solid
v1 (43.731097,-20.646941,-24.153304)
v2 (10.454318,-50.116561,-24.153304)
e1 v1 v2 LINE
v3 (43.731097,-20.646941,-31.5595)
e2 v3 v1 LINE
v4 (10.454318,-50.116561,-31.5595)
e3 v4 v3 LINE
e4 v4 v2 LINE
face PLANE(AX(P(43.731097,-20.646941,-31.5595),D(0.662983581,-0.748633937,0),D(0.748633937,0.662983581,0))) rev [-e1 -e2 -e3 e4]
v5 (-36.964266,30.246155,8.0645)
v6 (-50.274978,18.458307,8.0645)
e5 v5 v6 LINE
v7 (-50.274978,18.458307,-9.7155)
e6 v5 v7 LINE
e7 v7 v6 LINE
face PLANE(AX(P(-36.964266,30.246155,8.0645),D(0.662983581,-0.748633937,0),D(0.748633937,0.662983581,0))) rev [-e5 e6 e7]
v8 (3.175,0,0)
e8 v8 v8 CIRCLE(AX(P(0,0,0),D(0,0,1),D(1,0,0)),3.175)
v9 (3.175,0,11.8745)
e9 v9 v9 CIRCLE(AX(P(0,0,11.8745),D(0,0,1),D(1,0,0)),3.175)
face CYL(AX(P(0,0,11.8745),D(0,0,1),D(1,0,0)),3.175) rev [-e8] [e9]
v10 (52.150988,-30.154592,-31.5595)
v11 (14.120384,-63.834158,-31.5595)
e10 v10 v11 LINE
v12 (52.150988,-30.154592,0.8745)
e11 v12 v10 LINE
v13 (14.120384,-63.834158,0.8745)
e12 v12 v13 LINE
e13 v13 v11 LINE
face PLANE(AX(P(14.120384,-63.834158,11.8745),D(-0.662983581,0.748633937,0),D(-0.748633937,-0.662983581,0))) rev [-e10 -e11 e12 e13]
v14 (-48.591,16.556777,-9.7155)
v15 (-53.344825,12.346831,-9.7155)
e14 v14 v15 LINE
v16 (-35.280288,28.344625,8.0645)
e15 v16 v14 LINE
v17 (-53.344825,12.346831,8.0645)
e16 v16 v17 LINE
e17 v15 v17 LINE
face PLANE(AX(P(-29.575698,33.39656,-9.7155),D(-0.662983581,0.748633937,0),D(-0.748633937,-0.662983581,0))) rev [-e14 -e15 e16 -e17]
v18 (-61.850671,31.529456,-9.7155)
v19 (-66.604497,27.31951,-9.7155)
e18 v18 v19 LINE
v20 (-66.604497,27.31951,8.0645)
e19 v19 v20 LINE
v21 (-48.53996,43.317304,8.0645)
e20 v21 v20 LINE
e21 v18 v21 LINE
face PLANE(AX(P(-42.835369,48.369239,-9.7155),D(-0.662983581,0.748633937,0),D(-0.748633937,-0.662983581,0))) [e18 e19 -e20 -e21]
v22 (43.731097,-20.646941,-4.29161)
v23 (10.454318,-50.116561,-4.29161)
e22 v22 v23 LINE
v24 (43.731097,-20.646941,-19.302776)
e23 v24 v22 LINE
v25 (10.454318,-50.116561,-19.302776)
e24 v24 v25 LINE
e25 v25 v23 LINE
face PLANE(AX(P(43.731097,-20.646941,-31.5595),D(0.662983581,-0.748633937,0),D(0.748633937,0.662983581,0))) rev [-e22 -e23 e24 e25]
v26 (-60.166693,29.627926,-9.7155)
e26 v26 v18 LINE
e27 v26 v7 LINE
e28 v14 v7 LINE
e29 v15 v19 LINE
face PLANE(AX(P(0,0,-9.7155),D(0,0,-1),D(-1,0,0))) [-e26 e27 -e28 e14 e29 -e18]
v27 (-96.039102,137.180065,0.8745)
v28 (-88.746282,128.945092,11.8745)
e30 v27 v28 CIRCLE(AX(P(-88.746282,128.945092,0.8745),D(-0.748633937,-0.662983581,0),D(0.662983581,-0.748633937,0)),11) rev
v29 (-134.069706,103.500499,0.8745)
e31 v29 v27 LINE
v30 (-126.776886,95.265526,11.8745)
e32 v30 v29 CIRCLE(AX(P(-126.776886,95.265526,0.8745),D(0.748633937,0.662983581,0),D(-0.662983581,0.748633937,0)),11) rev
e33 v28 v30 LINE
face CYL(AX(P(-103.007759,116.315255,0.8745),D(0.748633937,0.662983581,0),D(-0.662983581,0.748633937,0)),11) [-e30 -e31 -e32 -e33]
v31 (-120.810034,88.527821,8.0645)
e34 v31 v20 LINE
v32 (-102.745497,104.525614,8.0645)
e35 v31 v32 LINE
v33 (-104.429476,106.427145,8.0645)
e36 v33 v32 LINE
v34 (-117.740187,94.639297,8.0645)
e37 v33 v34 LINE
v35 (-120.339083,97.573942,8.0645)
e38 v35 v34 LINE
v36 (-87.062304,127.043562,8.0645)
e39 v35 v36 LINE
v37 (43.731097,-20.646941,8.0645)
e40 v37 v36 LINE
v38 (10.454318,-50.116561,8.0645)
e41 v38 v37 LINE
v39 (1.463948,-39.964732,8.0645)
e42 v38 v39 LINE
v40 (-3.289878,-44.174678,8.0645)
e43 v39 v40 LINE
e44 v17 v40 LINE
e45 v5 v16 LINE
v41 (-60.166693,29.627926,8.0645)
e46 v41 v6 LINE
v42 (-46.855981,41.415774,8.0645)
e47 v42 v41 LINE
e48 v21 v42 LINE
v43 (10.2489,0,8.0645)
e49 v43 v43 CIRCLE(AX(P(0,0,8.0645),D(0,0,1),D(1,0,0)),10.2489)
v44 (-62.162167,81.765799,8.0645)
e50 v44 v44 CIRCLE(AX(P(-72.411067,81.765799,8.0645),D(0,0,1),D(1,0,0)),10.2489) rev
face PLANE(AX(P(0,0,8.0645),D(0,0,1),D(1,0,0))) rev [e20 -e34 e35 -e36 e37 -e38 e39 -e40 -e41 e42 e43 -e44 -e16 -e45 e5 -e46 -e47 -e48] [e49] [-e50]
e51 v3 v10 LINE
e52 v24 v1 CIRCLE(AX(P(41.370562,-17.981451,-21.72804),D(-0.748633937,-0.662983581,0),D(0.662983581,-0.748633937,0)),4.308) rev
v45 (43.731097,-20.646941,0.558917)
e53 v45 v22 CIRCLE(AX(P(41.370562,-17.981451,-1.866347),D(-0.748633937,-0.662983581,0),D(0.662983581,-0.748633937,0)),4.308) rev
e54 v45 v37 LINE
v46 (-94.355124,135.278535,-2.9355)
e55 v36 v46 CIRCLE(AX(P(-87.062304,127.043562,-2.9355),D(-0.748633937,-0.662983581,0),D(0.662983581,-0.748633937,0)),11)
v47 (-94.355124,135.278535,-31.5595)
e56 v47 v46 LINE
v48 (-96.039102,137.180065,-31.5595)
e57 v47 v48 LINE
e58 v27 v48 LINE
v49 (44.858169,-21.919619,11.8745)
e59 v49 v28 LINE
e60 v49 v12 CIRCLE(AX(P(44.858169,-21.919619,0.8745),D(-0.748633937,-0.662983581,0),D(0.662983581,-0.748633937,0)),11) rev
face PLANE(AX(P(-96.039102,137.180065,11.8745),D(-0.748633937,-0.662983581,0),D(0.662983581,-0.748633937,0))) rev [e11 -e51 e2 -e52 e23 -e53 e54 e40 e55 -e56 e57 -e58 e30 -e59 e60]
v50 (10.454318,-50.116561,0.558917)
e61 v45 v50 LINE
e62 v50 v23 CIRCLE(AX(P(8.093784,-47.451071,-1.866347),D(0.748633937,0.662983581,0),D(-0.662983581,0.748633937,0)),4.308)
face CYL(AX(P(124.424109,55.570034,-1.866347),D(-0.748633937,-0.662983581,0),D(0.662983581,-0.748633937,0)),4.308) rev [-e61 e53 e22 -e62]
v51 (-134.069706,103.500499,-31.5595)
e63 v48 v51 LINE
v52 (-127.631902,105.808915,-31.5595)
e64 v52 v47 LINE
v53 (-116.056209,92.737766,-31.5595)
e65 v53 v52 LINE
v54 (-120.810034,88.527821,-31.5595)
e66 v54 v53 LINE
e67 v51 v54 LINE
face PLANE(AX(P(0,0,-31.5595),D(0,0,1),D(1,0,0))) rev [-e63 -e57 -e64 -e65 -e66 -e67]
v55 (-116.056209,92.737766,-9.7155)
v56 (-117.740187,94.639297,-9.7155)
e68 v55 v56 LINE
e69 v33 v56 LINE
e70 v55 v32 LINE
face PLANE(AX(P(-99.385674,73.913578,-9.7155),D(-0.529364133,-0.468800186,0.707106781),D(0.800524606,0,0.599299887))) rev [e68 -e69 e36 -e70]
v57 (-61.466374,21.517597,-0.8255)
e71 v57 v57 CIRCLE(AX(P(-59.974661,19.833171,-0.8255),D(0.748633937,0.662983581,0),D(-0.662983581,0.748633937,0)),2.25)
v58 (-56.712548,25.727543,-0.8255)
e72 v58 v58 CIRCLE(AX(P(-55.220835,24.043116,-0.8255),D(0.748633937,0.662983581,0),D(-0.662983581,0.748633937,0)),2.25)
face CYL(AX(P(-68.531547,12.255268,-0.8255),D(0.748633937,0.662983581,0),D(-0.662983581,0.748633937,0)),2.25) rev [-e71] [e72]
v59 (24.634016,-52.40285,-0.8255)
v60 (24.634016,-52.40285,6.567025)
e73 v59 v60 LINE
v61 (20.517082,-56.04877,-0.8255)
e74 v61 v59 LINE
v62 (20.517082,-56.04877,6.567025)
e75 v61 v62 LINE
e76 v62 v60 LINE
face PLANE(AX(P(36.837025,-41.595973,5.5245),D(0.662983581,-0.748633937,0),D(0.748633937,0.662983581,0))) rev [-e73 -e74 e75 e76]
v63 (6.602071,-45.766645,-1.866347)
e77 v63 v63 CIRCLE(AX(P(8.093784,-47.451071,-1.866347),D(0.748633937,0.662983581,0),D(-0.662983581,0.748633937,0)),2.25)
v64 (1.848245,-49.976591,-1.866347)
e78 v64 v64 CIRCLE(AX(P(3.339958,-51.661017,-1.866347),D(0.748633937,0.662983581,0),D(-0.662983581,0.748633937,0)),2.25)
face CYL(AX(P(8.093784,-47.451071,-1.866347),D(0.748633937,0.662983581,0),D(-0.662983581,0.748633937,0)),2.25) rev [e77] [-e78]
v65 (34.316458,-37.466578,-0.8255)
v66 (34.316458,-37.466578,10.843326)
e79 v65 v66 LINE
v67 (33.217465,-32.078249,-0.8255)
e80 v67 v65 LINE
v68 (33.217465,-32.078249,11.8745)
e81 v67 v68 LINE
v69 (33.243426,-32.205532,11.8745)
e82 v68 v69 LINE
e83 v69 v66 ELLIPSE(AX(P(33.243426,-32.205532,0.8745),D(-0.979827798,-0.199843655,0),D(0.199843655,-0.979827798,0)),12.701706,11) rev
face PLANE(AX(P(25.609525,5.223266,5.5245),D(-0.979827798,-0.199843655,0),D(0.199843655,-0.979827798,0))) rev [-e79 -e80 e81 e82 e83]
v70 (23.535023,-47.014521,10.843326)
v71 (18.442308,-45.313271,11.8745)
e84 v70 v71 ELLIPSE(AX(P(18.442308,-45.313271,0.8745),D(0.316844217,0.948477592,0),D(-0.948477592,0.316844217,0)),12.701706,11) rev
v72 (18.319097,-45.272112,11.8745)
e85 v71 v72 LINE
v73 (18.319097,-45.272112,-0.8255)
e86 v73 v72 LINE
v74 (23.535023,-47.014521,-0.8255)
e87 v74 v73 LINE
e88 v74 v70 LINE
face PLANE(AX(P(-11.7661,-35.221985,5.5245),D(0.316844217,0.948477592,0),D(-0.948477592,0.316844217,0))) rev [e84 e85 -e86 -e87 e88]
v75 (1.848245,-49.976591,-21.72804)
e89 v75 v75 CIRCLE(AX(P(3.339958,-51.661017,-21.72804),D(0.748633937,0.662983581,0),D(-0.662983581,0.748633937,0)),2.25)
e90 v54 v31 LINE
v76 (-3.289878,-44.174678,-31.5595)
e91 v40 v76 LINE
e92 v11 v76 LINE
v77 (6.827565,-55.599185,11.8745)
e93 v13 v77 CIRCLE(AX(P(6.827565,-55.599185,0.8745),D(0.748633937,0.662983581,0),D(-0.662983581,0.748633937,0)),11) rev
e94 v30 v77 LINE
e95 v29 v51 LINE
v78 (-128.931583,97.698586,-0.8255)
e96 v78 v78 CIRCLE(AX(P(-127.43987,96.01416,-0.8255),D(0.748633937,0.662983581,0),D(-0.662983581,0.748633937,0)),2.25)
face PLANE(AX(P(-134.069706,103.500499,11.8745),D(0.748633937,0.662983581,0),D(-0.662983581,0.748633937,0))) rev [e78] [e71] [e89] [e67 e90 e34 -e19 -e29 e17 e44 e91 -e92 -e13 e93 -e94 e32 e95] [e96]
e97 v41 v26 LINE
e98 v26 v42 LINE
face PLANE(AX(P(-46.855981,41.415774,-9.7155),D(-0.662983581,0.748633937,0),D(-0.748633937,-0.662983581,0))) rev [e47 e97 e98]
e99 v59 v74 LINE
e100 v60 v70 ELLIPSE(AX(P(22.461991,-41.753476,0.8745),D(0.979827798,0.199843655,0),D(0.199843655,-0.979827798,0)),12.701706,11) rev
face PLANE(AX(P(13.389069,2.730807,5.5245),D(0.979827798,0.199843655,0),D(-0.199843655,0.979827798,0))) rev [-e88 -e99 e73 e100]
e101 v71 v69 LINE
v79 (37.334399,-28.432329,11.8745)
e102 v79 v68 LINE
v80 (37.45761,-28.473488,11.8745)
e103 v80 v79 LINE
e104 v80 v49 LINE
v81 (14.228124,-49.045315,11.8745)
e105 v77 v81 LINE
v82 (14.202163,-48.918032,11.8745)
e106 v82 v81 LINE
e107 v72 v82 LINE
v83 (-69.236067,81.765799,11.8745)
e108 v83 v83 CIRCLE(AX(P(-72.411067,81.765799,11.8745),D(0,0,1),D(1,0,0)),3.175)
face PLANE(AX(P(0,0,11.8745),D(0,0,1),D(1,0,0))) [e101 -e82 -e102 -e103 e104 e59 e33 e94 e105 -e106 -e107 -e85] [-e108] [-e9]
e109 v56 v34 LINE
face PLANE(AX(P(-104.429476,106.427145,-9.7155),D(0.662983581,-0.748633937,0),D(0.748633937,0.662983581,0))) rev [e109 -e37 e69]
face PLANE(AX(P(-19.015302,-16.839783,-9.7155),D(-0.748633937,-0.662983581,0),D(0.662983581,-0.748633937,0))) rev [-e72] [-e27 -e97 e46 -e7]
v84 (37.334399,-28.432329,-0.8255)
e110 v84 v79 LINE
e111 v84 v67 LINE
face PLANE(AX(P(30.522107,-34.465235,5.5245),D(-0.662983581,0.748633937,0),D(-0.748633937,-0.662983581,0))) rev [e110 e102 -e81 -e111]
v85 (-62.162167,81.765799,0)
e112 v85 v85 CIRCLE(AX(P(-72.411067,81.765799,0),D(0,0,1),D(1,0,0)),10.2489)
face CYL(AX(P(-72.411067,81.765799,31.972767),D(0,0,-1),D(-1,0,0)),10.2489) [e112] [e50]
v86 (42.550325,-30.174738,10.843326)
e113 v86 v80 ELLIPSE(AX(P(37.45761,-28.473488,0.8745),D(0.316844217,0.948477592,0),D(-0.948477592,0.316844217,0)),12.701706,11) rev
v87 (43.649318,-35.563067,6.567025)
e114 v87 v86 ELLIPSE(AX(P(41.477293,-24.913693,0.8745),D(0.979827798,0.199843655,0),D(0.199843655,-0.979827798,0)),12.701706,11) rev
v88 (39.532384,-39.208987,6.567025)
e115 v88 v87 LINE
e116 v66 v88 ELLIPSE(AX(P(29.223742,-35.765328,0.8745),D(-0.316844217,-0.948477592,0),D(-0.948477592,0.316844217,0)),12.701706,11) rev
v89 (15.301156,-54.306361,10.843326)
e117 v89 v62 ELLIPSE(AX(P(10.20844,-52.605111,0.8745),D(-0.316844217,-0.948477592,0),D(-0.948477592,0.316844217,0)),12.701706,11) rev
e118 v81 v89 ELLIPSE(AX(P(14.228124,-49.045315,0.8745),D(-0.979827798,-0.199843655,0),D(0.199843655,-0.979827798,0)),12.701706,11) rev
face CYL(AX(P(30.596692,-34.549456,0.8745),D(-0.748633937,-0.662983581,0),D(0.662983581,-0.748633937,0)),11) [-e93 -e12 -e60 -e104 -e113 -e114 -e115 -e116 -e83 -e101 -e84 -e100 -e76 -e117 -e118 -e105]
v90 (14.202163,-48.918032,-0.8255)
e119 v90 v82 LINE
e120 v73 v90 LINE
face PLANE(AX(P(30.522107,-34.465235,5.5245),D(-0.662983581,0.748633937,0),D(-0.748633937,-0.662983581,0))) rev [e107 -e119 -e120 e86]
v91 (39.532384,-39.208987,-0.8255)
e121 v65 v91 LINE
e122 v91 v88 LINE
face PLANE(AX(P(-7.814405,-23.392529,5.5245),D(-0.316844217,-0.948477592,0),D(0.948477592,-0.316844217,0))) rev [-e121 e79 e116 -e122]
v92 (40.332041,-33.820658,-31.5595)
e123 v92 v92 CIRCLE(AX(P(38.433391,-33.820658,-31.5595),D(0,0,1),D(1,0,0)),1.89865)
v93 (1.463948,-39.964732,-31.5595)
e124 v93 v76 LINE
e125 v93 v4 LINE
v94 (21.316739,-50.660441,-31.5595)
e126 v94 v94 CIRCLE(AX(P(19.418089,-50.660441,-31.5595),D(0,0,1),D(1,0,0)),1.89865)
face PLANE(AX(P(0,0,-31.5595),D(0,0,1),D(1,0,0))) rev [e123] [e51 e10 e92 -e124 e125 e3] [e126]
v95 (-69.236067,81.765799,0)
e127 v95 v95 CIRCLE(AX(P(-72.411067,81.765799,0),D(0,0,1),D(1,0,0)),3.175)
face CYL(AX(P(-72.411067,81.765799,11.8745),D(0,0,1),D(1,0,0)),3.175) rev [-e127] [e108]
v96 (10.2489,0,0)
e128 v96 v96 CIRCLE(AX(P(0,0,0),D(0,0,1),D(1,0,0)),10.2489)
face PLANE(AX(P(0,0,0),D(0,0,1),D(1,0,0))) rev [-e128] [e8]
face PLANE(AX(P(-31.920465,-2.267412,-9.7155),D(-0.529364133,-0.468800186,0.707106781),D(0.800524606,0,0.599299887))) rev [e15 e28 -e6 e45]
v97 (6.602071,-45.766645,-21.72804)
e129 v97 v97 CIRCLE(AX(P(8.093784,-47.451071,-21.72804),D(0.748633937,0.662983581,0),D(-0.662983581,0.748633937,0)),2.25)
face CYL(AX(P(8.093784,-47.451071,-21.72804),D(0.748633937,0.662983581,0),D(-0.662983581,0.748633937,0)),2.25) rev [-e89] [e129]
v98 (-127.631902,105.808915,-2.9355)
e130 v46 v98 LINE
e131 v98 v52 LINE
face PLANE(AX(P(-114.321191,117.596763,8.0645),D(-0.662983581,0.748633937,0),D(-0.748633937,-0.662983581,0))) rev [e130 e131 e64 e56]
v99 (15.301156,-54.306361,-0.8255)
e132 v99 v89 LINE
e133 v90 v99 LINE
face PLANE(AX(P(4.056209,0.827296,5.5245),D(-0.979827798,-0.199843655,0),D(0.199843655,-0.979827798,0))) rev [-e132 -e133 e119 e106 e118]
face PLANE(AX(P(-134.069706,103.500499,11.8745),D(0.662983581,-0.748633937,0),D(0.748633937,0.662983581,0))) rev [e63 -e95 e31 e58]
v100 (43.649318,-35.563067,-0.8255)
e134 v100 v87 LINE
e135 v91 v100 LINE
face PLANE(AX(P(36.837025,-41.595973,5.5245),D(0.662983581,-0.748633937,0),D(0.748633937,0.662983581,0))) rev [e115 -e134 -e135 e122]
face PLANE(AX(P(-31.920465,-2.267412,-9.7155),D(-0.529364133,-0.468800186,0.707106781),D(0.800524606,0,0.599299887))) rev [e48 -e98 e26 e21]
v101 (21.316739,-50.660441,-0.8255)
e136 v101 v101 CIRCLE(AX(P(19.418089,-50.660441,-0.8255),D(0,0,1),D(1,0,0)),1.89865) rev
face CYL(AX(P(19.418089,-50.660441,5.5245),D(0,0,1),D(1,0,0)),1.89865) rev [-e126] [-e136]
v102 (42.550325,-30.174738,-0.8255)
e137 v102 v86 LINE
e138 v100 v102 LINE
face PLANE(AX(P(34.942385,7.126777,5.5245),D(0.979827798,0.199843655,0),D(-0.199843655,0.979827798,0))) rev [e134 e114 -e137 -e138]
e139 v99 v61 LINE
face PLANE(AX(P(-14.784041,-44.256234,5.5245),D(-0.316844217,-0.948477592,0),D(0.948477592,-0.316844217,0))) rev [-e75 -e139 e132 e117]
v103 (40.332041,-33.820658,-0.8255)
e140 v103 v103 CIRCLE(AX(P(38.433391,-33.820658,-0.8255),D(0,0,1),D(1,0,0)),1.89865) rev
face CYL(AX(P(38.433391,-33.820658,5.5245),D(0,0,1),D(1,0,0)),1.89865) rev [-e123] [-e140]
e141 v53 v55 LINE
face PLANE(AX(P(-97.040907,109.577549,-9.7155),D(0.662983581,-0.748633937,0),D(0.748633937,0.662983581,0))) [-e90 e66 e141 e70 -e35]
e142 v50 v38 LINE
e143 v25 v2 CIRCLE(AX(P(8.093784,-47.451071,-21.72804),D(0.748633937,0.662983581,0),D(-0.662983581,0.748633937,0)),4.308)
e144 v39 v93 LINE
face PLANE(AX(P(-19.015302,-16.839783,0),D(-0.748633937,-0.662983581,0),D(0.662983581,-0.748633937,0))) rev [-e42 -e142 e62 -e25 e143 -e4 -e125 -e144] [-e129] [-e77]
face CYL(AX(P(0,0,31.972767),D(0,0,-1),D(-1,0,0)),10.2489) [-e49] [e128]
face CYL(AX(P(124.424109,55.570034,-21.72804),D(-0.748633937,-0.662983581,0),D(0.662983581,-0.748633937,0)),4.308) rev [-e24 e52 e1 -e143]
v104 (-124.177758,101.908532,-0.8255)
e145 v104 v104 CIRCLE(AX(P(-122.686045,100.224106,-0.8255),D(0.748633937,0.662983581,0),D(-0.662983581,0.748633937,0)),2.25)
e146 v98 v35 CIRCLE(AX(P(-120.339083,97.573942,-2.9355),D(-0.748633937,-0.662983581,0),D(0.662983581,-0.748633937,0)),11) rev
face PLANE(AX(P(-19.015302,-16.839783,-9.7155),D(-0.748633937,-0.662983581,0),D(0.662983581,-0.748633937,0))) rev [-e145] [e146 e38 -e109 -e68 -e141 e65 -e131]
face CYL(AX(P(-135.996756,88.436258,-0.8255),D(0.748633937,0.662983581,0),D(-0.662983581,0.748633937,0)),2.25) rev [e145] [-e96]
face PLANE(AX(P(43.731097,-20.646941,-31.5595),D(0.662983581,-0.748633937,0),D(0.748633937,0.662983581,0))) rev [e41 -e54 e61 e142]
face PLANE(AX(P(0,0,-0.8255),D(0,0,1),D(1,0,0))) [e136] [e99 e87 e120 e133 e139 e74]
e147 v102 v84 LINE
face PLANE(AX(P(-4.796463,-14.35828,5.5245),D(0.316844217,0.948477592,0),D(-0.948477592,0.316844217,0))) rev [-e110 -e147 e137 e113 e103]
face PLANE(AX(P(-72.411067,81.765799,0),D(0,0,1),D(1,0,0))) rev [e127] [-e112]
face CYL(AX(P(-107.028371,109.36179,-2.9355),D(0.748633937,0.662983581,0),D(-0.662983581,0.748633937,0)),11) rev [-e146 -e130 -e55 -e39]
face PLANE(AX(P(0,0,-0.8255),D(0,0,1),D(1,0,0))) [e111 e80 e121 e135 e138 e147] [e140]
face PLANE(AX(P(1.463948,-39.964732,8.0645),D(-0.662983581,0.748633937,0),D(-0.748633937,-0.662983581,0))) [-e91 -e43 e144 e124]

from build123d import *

# Parameters (mm, degrees)
SKETCH1_R                   = 10.2489
BOSS_EXTRUDE1_DEPTH         = 2.9845
BOSS_EXTRUDE1_2_DEPTH       = 2.9845
SKETCH2_R                   = 10.2489
BOSS_EXTRUDE2_DEPTH         = 5.08
BOSS_EXTRUDE3_DEPTH         = 3.81
F_1_4_0_25_DIAMETER_HOLE1_D = 6.35
BOSS_EXTRUDE4_DEPTH         = 17.78
SKETCH8_R                   = 2.25
CUT_EXTRUDE1_DEPTH          = 17.78
SKETCH9_W                   = 17.78
SKETCH9_H                   = 2.54
BOSS_EXTRUDE5_DEPTH         = 17.78
CUT_EXTRUDE2_REACH          = 251.039
CUT_EXTRUDE3_DEPTH          = 20
BOSS_EXTRUDE6_DEPTH         = 2.54
BOSS_EXTRUDE7_DEPTH         = 39.624
CUT_EXTRUDE5_DEPTH          = 6.35
F_6_CLEARANCE_HOLE1_D       = 3.7973
SKETCH19_W                  = 39.624
SKETCH19_H                  = 13.560471889
BOSS_EXTRUDE8_DEPTH         = 6.35
M4_CLEARANCE_HOLE1_D        = 4.5
SKETCH20_R                  = 4.308
CUT_EXTRUDE6_DEPTH          = 195.822050963
FILLET1_R                   = 11
CUT_EXTRUDE7_DEPTH          = 6.35
BOSS_EXTRUDE9_DEPTH         = 21.844


with BuildPart() as part:
    # Sketch1 → Boss-Extrude1 (new body)
    with BuildSketch(Plane.XY):
        Circle(SKETCH1_R)
    extrude(amount=BOSS_EXTRUDE1_DEPTH)



with BuildPart() as body_2:
    # Sketch1 → Boss-Extrude1 2 (new body)
    with BuildSketch(Plane.XY):
        with Locations((-72.411066703, 81.765798589)):
            Circle(SKETCH1_R)
    extrude(amount=BOSS_EXTRUDE1_2_DEPTH)


with BuildPart() as part_1:
    add(part.part)

    add(body_2.part)  # Boss-Extrude2 merges body 2
    # Sketch2 → Boss-Extrude2 (add)
    with BuildSketch(Plane.XY.offset(2.9845)):
        with Locations((-72.411066703, 81.765798589)):
            Circle(SKETCH2_R)
        Circle(SKETCH2_R)
    extrude(amount=BOSS_EXTRUDE2_DEPTH)

    # Sketch3 → Boss-Extrude3 (add)
    with BuildSketch(Plane.XY.offset(8.0645)):
        Polygon((-134.069705847, 103.500499391), (-96.039101852, 137.180065299), (52.150988145, -30.154592279), (14.12038415, -63.834158187), align=None)
    extrude(amount=BOSS_EXTRUDE3_DEPTH)

    # 1/4 (0.25) Diameter Hole1 (through all)
    with Locations(Plane.XY.offset(11.8745)):
        with Locations((0, 0), (-72.411066703, 81.765798589)):
            Hole(F_1_4_0_25_DIAMETER_HOLE1_D / 2)

    # Sketch7 → Boss-Extrude4 (add)
    with BuildSketch(Plane(origin=(0, 0, 8.0645), x_dir=(-1, 0, 0), z_dir=(0, 0, -1))):
        Polygon((53.34482504, 12.346831233), (66.604496657, 27.319509971), (61.850671158, 31.529455709), (48.59099954, 16.556776971), align=None)
        Polygon((120.810034229, 88.527820652), (134.069705847, 103.500499391), (129.315880348, 107.710445129), (116.05620873, 92.737766391), align=None)
    extrude(amount=BOSS_EXTRUDE4_DEPTH)

    # Sketch8 → Cut-Extrude1 (cut)
    with BuildSketch(Plane(origin=(-19.015301997, -16.839782954, 0), x_dir=(0, 0, -1), z_dir=(0.7486339369082552, 0.6629835808745542, 0))):
        with Locations(Location((0.8255, 54.61, 0), (0, 0, 90))):
            Circle(SKETCH8_R)
        with Locations(Location((0.8255, 156.37, 0), (0, 0, 90))):
            Circle(SKETCH8_R)
    extrude(amount=-CUT_EXTRUDE1_DEPTH, mode=Mode.SUBTRACT)

    # Sketch9 → Boss-Extrude5 (add)
    with BuildSketch(Plane(origin=(-19.015301997, -16.839782954, 0), x_dir=(0, 0, -1), z_dir=(0.7486339369082552, 0.6629835808745542, 0))):
        with Locations((0.8255, 63.34)):
            Rectangle(SKETCH9_W, SKETCH9_H)
        with Locations((0.8255, 45.88)):
            Rectangle(SKETCH9_W, SKETCH9_H)
        with Locations((0.8255, 165.1)):
            Rectangle(SKETCH9_W, SKETCH9_H)
        with Locations((0.8255, 147.64)):
            Rectangle(SKETCH9_W, SKETCH9_H)
    extrude(amount=BOSS_EXTRUDE5_DEPTH)

    # Cut-Extrude2: up to this face of the body (flat: up to its plane)
    cut_extrude2_end = Plane(part_1.part.faces().sort_by_distance((-111.777765781, 96.526717556, -0.8255))[0])
    # Sketch10 → Cut-Extrude2 (cut, up to the picked face)
    with BuildSketch(Plane(origin=(-110.30057835, 124.550228083, 0), x_dir=(0.7486339369082557, 0.6629835808745536, 0), z_dir=(-0.6629835808745536, 0.7486339369082557, 0)), mode=Mode.PRIVATE) as cut_extrude2_sk1:
        Polygon((-7.62, 9.7155), (-7.62, -8.0645), (-25.4, 9.7155), align=None)
    cut_extrude2_tool1 = split(extrude(cut_extrude2_sk1.sketch, amount=-CUT_EXTRUDE2_REACH, mode=Mode.PRIVATE), bisect_by=cut_extrude2_end, keep=Keep.BOTH, mode=Mode.PRIVATE)
    add(cut_extrude2_tool1.solids().sort_by(Axis((-120.442073, 115.569011, -3.788833), (0.6629835808745536, -0.7486339369082557, 0)))[0], mode=Mode.SUBTRACT)

    # Sketch11 → Cut-Extrude3 (cut)
    with BuildSketch(Plane(origin=(-42.83536916, 48.369238664, 0), x_dir=(0.7486339369082559, 0.6629835808745536, 0), z_dir=(-0.6629835808745536, 0.7486339369082559, 0))):
        Polygon((-7.62, 9.7155), (-7.62, -8.0645), (-25.4, 9.7155), align=None)
    extrude(amount=-CUT_EXTRUDE3_DEPTH, mode=Mode.SUBTRACT)

    # Sketch13 → Boss-Extrude6 (add)
    with BuildSketch(Plane(origin=(-110.30057835, 124.550228083, 0), x_dir=(0.7486339369082557, 0.6629835808745536, 0), z_dir=(-0.6629835808745536, 0.7486339369082557, 0))):
        Polygon((-25.4, 9.7155), (19.05, 9.7155), (19.05, -8.0645), (-7.62, -8.0645), align=None)
    extrude(amount=-BOSS_EXTRUDE6_DEPTH)

    # Sketch14 → Boss-Extrude7 (add)
    with BuildSketch(Plane(origin=(0, 0, 8.0645), x_dir=(-1, 0, 0), z_dir=(0, 0, -1))):
        Polygon((-52.150988145, -30.154592279), (-14.12038415, -63.834158187), (-5.700492673, -54.326507188), (-43.731096668, -20.64694128), align=None)
    extrude(amount=BOSS_EXTRUDE7_DEPTH)

    # Sketch15 → Cut-Extrude5 (cut)
    with BuildSketch(Plane.XY.offset(11.8745)):
        Polygon((38.433391408, -33.820658256), (42.550325055, -30.174738298), (37.334398928, -28.432329153), (33.21746528, -32.078249111), (33.824088825, -35.052507224), align=None)
        Polygon((43.649317536, -35.563067402), (43.042693991, -32.588809289), (38.433391408, -33.820658256), (34.31645776, -37.466578215), (39.532383888, -39.20898736), align=None)
        Polygon((38.433391408, -33.820658256), (43.042693991, -32.588809289), (42.550325055, -30.174738298), align=None)
        Polygon((34.31645776, -37.466578215), (38.433391408, -33.820658256), (33.824088825, -35.052507224), align=None)
        Polygon((21.198191786, -46.233889763), (19.41808941, -50.660441211), (23.535023058, -47.014521252), align=None)
        Polygon((15.301155763, -54.306361169), (17.637987035, -55.086992658), (19.41808941, -50.660441211), align=None)
        Polygon((14.202163283, -48.918032065), (15.301155763, -54.306361169), (19.41808941, -50.660441211), (21.198191786, -46.233889763), (18.31909693, -45.272112107), align=None)
        Polygon((19.41808941, -50.660441211), (17.637987035, -55.086992658), (20.51708189, -56.048770314), (24.634015538, -52.402850356), (23.535023058, -47.014521252), align=None)
    extrude(amount=-CUT_EXTRUDE5_DEPTH, mode=Mode.SUBTRACT)

    # #6 Clearance Hole1 (through all)
    with Locations(Plane.XY.offset(5.5245)):
        with Locations((19.41808941, -50.660441211), (38.433391408, -33.820658256)):
            Hole(F_6_CLEARANCE_HOLE1_D / 2)

    # Sketch19 → Boss-Extrude8 (add)
    with BuildSketch(Plane(origin=(-23.769127497, -21.049728693, 0), x_dir=(0, 0, 1), z_dir=(-0.7486339369082559, -0.6629835808745536, 0))):
        with Locations((-11.7475, -37.669764056)):
            Rectangle(SKETCH19_W, SKETCH19_H)
    extrude(amount=-BOSS_EXTRUDE8_DEPTH)

    # M4 Clearance Hole1 (through all)
    with Locations(Plane(origin=(-19.015301997, -16.839782954, 0), x_dir=(0, 0, -1), z_dir=(0.7486339369082555, 0.6629835808745539, 0))):
        with Locations((1.866346616, -40.889528111), (21.728039849, -40.889528111)):
            Hole(M4_CLEARANCE_HOLE1_D / 2)

    # Sketch20 → Cut-Extrude6 (cut, through all)
    with BuildSketch(Plane(origin=(-19.015301997, -16.839782954, 0), x_dir=(0, 0, -1), z_dir=(0.7486339369082555, 0.6629835808745539, 0))):
        with Locations((21.728039849, -40.889528111)):
            Circle(SKETCH20_R)
        with Locations((1.866346616, -40.889528111)):
            Circle(SKETCH20_R)
    extrude(amount=CUT_EXTRUDE6_DEPTH, mode=Mode.SUBTRACT)

    # Fillet1
    # the kernel refuses this fillet: 11 mm, written as the material it adds along each edge
    with BuildSketch(Plane(origin=(-127.631902052, 105.808914929, 8.0645), x_dir=(0.6629835808745532, -0.7486339369082561, 1.2918958832001814e-15), z_dir=(0.7486339369082562, 0.6629835808745532, 0))) as fillet1_piece_1:
        with BuildLine():
            CenterArc((FILLET1_R, FILLET1_R), FILLET1_R, 180, 90)
            Line((0, FILLET1_R), (0, 0))
            Line((0, 0), (FILLET1_R, 0))
        make_face()
    extrude(amount=44.45)
    # the kernel refuses this fillet: 11 mm, written as the material it takes off along each edge
    with BuildSketch(Plane(origin=(-154.657139112, 85.268450917, 11.8745), x_dir=(0, 0, -1), z_dir=(0.7486339369082557, 0.6629835808745537, 0))) as fillet1_2_piece_1:
        with BuildLine():
            CenterArc((FILLET1_R, -FILLET1_R), FILLET1_R, 90, 90)
            Line((0, -FILLET1_R), (0, 0))
            Line((0, 0), (FILLET1_R, 0))
        make_face()
    extrude(amount=105.8, mode=Mode.SUBTRACT)
    with BuildSketch(Plane(origin=(72.73842141, -11.922543805, 11.8745), x_dir=(-0.6629835808745536, 0.7486339369082557, 0), z_dir=(-0.7486339369082559, -0.6629835808745537, 0))) as fillet1_2_piece_2:
        with BuildLine():
            CenterArc((FILLET1_R, FILLET1_R), FILLET1_R, 180, 90)
            Line((0, FILLET1_R), (0, 0))
            Line((0, 0), (FILLET1_R, 0))
        make_face()
    extrude(amount=105.8, mode=Mode.SUBTRACT)

    # Sketch23 → Cut-Extrude7 (cut)
    with BuildSketch(Plane.XY.offset(5.5245)):
        Polygon((37.334398928, -28.432329153), (33.21746528, -32.078249111), (34.31645776, -37.466578215), (39.532383888, -39.20898736), (43.649317536, -35.563067402), (42.550325055, -30.174738298), align=None)
        Polygon((14.202163283, -48.918032065), (15.301155763, -54.306361169), (20.51708189, -56.048770314), (24.634015538, -52.402850356), (23.535023058, -47.014521252), (18.31909693, -45.272112107), align=None)
    extrude(amount=-CUT_EXTRUDE7_DEPTH, mode=Mode.SUBTRACT)

    # Sketch24 → Boss-Extrude9 (add)
    with BuildSketch(Plane(origin=(0, 0, -9.7155), x_dir=(-1, 0, 0), z_dir=(0, 0, -1))):
        Polygon((117.740187025, 94.639296591), (116.05620873, 92.737766391), (120.810034229, 88.527820652), (134.069705847, 103.500499391), (96.039101852, 137.180065299), (94.355123557, 135.278535099), (127.631902052, 105.808914929), align=None)
    extrude(amount=BOSS_EXTRUDE9_DEPTH)


solid = part_1.part
